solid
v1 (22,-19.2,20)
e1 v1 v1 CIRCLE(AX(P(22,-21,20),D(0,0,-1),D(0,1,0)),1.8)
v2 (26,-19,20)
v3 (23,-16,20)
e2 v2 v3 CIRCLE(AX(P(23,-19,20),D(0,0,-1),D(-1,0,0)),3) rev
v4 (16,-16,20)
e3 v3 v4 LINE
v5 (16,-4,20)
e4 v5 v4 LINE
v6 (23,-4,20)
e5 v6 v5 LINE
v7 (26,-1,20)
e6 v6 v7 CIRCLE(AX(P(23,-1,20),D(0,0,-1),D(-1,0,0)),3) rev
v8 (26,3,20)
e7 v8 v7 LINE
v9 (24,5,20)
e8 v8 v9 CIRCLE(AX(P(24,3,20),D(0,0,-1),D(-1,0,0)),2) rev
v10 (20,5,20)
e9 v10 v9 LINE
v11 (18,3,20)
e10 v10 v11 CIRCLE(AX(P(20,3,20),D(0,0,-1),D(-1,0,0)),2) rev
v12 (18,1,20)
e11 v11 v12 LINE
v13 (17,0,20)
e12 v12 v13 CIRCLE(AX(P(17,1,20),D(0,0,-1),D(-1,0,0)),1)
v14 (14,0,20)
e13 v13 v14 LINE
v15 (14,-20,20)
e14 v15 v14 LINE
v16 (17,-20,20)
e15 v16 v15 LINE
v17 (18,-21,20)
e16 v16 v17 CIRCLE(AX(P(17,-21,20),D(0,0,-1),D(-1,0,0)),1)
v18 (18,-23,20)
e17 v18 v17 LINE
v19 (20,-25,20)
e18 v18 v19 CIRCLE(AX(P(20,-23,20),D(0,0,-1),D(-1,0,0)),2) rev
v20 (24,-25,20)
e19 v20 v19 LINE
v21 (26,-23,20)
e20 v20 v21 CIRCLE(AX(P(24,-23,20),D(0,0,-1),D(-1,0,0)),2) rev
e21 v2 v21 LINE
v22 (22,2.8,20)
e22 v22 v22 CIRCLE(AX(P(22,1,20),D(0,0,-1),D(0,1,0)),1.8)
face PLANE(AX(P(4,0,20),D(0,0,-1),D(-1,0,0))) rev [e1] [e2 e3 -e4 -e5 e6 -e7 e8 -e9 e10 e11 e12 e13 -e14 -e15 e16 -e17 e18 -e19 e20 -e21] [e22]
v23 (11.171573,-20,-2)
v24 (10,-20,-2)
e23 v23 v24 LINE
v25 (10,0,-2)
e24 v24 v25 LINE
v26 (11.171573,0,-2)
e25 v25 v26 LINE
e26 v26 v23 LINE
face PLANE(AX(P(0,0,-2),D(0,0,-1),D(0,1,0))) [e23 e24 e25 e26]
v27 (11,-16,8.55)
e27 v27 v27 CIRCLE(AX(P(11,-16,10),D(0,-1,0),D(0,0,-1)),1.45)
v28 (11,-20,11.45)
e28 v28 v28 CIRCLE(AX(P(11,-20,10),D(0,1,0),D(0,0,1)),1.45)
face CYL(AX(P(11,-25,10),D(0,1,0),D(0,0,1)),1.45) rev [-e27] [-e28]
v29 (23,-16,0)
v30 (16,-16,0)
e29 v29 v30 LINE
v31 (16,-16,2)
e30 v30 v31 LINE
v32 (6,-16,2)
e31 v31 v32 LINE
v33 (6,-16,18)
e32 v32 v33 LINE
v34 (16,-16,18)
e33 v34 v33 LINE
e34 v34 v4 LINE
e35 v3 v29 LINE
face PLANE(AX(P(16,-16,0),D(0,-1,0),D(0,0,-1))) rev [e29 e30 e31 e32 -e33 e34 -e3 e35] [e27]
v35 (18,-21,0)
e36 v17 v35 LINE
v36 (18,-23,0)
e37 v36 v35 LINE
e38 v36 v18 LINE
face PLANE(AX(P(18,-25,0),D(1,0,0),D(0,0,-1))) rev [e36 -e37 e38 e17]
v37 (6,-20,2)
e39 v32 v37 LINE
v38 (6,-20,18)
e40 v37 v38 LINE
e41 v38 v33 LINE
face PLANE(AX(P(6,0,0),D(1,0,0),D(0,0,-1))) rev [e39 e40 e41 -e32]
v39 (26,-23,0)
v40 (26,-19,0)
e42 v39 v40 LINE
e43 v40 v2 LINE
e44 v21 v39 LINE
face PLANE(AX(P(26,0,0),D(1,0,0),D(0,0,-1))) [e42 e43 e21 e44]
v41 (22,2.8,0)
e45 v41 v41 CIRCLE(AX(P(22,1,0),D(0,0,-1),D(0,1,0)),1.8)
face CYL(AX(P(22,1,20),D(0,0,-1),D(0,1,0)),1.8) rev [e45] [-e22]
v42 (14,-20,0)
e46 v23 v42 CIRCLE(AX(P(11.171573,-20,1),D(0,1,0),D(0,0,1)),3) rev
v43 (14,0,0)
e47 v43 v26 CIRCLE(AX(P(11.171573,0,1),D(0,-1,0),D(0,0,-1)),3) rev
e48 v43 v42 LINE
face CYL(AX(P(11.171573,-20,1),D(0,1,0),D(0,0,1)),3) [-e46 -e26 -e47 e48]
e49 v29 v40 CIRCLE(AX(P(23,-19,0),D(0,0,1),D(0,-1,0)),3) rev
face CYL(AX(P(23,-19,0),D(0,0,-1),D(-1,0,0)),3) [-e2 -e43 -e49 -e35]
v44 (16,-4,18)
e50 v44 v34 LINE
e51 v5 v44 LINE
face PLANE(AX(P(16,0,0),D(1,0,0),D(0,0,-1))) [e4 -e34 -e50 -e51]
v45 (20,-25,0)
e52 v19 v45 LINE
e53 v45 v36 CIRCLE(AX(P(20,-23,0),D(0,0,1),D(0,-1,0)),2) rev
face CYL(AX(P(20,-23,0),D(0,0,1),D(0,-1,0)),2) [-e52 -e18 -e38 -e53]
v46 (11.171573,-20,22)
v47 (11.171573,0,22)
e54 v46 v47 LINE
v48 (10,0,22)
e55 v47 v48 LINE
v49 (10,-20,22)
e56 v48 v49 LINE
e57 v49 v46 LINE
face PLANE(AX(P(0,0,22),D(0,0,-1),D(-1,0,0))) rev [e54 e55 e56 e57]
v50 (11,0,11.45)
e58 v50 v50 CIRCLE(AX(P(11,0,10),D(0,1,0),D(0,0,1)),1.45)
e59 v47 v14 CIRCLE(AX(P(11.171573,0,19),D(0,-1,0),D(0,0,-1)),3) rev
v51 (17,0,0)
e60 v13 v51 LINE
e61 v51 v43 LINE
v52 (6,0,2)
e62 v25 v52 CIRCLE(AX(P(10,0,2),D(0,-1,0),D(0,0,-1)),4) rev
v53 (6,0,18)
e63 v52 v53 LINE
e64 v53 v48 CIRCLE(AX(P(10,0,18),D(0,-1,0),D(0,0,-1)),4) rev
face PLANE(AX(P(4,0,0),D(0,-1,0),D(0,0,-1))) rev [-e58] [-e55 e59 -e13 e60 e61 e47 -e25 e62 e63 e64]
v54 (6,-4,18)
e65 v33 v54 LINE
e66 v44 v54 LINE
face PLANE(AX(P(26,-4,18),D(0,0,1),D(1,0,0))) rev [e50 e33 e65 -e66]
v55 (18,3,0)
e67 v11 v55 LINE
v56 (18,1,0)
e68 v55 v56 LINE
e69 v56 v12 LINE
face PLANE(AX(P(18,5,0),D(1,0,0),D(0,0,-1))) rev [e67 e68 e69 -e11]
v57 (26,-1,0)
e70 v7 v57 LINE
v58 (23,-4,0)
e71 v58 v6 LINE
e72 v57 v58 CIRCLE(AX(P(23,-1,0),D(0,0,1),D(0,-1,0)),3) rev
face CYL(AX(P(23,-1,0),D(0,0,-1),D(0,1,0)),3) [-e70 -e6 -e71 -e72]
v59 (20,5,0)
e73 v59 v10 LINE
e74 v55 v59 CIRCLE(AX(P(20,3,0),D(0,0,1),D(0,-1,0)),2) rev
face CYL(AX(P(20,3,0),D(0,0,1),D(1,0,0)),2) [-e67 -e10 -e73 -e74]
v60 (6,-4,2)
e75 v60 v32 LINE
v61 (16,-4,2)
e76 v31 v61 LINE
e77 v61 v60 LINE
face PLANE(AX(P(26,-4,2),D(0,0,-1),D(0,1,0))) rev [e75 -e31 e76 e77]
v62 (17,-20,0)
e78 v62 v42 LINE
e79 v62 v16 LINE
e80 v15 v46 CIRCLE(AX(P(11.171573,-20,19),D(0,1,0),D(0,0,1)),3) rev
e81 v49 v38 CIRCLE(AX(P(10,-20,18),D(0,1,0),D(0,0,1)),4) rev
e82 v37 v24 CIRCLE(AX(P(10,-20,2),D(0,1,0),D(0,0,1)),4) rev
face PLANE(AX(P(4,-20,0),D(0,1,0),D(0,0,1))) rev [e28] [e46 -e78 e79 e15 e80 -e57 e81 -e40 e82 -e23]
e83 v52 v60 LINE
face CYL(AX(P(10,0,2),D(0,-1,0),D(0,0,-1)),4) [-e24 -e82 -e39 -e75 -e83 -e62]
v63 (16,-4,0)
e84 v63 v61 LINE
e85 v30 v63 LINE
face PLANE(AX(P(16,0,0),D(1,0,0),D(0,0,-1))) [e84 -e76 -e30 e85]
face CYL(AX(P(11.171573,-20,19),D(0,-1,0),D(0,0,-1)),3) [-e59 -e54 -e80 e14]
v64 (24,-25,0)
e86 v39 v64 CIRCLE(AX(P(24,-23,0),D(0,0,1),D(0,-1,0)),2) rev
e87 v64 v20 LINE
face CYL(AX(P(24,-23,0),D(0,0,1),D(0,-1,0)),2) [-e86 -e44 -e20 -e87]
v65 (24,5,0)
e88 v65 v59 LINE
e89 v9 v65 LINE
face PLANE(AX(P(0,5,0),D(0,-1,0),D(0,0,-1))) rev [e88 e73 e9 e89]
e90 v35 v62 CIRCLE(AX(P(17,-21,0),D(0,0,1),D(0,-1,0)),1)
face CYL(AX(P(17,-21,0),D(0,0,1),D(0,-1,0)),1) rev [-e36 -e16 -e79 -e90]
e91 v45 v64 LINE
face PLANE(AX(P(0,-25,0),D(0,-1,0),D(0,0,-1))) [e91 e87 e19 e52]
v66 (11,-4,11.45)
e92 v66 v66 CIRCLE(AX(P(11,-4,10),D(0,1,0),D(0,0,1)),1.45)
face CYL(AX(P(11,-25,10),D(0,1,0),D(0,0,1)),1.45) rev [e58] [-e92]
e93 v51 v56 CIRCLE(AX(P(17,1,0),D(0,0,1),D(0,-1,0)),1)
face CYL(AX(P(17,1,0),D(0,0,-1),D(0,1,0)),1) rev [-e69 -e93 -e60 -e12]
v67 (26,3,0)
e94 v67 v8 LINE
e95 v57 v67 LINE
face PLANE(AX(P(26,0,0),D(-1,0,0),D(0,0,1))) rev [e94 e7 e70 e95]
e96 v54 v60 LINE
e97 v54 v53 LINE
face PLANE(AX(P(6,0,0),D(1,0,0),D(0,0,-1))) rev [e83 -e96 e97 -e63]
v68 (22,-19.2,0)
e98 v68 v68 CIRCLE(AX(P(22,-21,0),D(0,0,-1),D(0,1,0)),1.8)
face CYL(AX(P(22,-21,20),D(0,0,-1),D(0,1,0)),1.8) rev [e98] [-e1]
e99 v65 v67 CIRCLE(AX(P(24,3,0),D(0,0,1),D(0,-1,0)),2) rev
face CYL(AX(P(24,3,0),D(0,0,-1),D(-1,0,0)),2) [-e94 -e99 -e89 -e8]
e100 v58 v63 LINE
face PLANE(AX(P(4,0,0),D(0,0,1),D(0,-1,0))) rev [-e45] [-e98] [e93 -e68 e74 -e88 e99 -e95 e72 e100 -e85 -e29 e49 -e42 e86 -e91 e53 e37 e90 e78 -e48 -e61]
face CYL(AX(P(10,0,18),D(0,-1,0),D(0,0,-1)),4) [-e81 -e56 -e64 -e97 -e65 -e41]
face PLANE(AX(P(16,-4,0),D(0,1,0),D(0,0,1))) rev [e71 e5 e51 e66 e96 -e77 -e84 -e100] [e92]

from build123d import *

# Parameters (mm, degrees)
SKETCH1_W           = 20
SKETCH1_H           = 20
BOSS_EXTRUDE1_DEPTH = 4
SKETCH2_R           = 3.7
CUT_EXTRUDE1_DEPTH  = 2.6
SKETCH3_R           = 2.1
CUT_EXTRUDE2_DEPTH  = 29.403520909
SKETCH4_W           = 12
SKETCH4_H           = 4
BOSS_EXTRUDE2_DEPTH = 12
SKETCH7_W           = 20
SKETCH7_H           = 4
BOSS_EXTRUDE3_DEPTH = 10
SKETCH8_W           = 8
SKETCH8_H           = 20
BOSS_EXTRUDE4_DEPTH = 5
SKETCH9_W           = 8
SKETCH9_H           = 20
BOSS_EXTRUDE5_DEPTH = 5
SKETCH10_R          = 1.8
CUT_EXTRUDE5_DEPTH  = 42.243181255
SKETCH11_W          = 30
SKETCH11_H          = 30
CUT_EXTRUDE6_DEPTH  = 6
SKETCH12_R          = 1.45
CUT_EXTRUDE7_DEPTH  = 42.243181255
SKETCH13_W          = 8
SKETCH13_H          = 20
BOSS_EXTRUDE6_DEPTH = 2
SKETCH14_W          = 8
SKETCH14_H          = 20
BOSS_EXTRUDE7_DEPTH = 2
SKETCH15_W          = 16
SKETCH15_H          = 12
CUT_EXTRUDE8_DEPTH  = 39.845849199
FILLET2_R           = 3
FILLET4_R           = 2
FILLET5_START       = -21
FILLET5_DEPTH       = 22
FILLET6_R           = 3
FILLET7_R           = 1
FILLET8_R           = 1


with BuildPart() as part:
    # Sketch1 → Boss-Extrude1 (new body)
    with BuildSketch(Plane(origin=(0, 0, 0), x_dir=(0, 0, -1), z_dir=(1, 0, 0))):
        with Locations((-10, -10)):
            Rectangle(SKETCH1_W, SKETCH1_H)
    extrude(amount=BOSS_EXTRUDE1_DEPTH)

    # Sketch2 → Cut-Extrude1 (cut)
    with BuildSketch(Plane(origin=(4, 0, 0), x_dir=(0, 0, -1), z_dir=(1, 0, 0))):
        with Locations((-10, -10)):
            Circle(SKETCH2_R)
    extrude(amount=-CUT_EXTRUDE1_DEPTH, mode=Mode.SUBTRACT)

    # Sketch3 → Cut-Extrude2 (cut, through all)
    with BuildSketch(Plane(origin=(1.4, 0, 0), x_dir=(0, 0, -1), z_dir=(1, 0, 0))):
        with Locations((-10, -10)):
            Circle(SKETCH3_R)
    extrude(amount=-CUT_EXTRUDE2_DEPTH, mode=Mode.SUBTRACT)

    # Sketch4 → Boss-Extrude2 (add)
    with BuildSketch(Plane(origin=(4, 0, 0), x_dir=(0, 0, -1), z_dir=(1, 0, 0))):
        Polygon((-20, 0), (-20, -20), (-16, -20), (-16, -16), (-16, -4), (-16, 0), align=None)
        with Locations((-10, -18)):
            Rectangle(SKETCH4_W, SKETCH4_H)
        Polygon((-4, -16), (-4, -20), (0, -20), (0, -4), (-4, -4), align=None)
        Polygon((0, 0), (-16, 0), (-16, -4), (-4, -4), (0, -4), align=None)
    extrude(amount=BOSS_EXTRUDE2_DEPTH)

    # Sketch7 → Boss-Extrude3 (add)
    with BuildSketch(Plane(origin=(16, 0, 0), x_dir=(0, 0, -1), z_dir=(1, 0, 0))):
        with Locations((-10, -18)):
            Rectangle(SKETCH7_W, SKETCH7_H)
        with Locations((-10, -2)):
            Rectangle(SKETCH7_W, SKETCH7_H)
    extrude(amount=BOSS_EXTRUDE3_DEPTH)

    # Sketch8 → Boss-Extrude4 (add)
    with BuildSketch(Plane(origin=(0, -20, 0), x_dir=(-1, 0, 0), z_dir=(0, -1, 0))):
        with Locations((-22, -10)):
            Rectangle(SKETCH8_W, SKETCH8_H)
    extrude(amount=BOSS_EXTRUDE4_DEPTH)

    # Sketch9 → Boss-Extrude5 (add)
    with BuildSketch(Plane(origin=(0, 0, 0), x_dir=(1, 0, 0), z_dir=(0, 1, 0))):
        with Locations((22, -10)):
            Rectangle(SKETCH9_W, SKETCH9_H)
    extrude(amount=BOSS_EXTRUDE5_DEPTH)

    # Sketch10 → Cut-Extrude5 (cut, through all)
    with BuildSketch(Plane(origin=(0, 0, 0), x_dir=(-1, 0, 0), z_dir=(0, 0, -1))):
        with Locations(Location((-22, 1, 0), (0, 0, 90))):
            Circle(SKETCH10_R)
        with Locations(Location((-22, -21, 0), (0, 0, 90))):
            Circle(SKETCH10_R)
    extrude(amount=-CUT_EXTRUDE5_DEPTH, mode=Mode.SUBTRACT)

    # Sketch11 → Cut-Extrude6 (cut)
    with BuildSketch(Plane.ZY):
        with Locations((15, -5)):
            Rectangle(SKETCH11_W, SKETCH11_H)
    extrude(amount=-CUT_EXTRUDE6_DEPTH, mode=Mode.SUBTRACT)

    # Sketch12 → Cut-Extrude7 (cut, through all)
    with BuildSketch(Plane(origin=(0, 0, 0), x_dir=(1, 0, 0), z_dir=(0, 1, 0))):
        with Locations(Location((11, -10, 0), (0, 0, 270))):
            Circle(SKETCH12_R)
    extrude(amount=-CUT_EXTRUDE7_DEPTH, mode=Mode.SUBTRACT)

    # Sketch13 → Boss-Extrude6 (add)
    with BuildSketch(Plane.XY.offset(20)):
        with Locations((10, -10)):
            Rectangle(SKETCH13_W, SKETCH13_H)
    extrude(amount=BOSS_EXTRUDE6_DEPTH)

    # Sketch14 → Boss-Extrude7 (add)
    with BuildSketch(Plane(origin=(0, 0, 0), x_dir=(-1, 0, 0), z_dir=(0, 0, -1))):
        with Locations((-10, -10)):
            Rectangle(SKETCH14_W, SKETCH14_H)
    extrude(amount=BOSS_EXTRUDE7_DEPTH)

    # Sketch15 → Cut-Extrude8 (cut, through all)
    with BuildSketch(Plane.ZY.offset(-6)):
        with Locations((10, -10)):
            Rectangle(SKETCH15_W, SKETCH15_H)
    extrude(amount=-CUT_EXTRUDE8_DEPTH, mode=Mode.SUBTRACT)

    # Fillet2
    fillet2_edges = [part.edges().sort_by_distance(p)[0] for p in [
        (26, -16, 10),
        (26, -4, 10),
    ]]
    fillet(fillet2_edges, radius=FILLET2_R)

    # Fillet4
    fillet4_edges = [part.edges().sort_by_distance(p)[0] for p in [
        (26, -25, 10),
        (18, -25, 10),
        (26, 5, 10),
        (18, 5, 10),
    ]]
    fillet(fillet4_edges, radius=FILLET4_R)

    # Fillet5: read off the stored shape, not the designer's step
    # Fillet5 outline → Fillet5 (cut)
    with BuildSketch(Plane(origin=(0, 0, 0), x_dir=(1, 0, 0), z_dir=(0, 1, 0)).offset(FILLET5_START)):
        with BuildLine():
            Line((6, 2), (6, -2))
            ThreePointArc((6, -2), (7.171572875, 0.828427125), (10, 2))
            Line((10, 2), (6, 2))
        make_face()
        with BuildLine():
            ThreePointArc((10, -22), (7.171572875, -20.828427125), (6, -18))
            Line((6, -18), (6, -22))
            Line((6, -22), (10, -22))
        make_face()
    extrude(amount=FILLET5_DEPTH, mode=Mode.SUBTRACT)

    # Fillet6
    # the kernel refuses this fillet: 3 mm, written as the material it takes off along each edge
    with BuildSketch(Plane(origin=(14, -27.071067812, -2), x_dir=(-1, 0, 0), z_dir=(0, 1, 0))) as fillet6_piece_1:
        with BuildLine():
            CenterArc((2.828427125, 3), FILLET6_R, 199.471220634, 70.528779366)
            Line((0, 2), (-0.056568542, 1.98))
            ThreePointArc((-0.056568542, 1.98), (-0.06, 1), (-0.06, 0))
            Line((-0.06, 0), (0, -0.06))
            Line((0, -0.06), (2.828427125, -0.06))
            Line((2.828427125, -0.06), (2.828427125, 0))
        make_face()
    extrude(amount=34.142135624, mode=Mode.SUBTRACT)
    with BuildSketch(Plane(origin=(14, -27.071067812, 22), x_dir=(0, 0, -1), z_dir=(0, 1, 0))) as fillet6_piece_2:
        with BuildLine():
            CenterArc((3, 2.828427125), FILLET6_R, 180, 70.528779366)
            Line((0, 2.828427125), (-0.06, 2.828427125))
            Line((-0.06, 2.828427125), (-0.06, 0))
            Line((-0.06, 0), (0, -0.06))
            ThreePointArc((0, -0.06), (1, -0.06), (1.98, -0.056568542))
            Line((1.98, -0.056568542), (2, 0))
        make_face()
    extrude(amount=34.142135624, mode=Mode.SUBTRACT)

    # Fillet7
    fillet7_edges = [part.edges().sort_by_distance(p)[0] for p in [
        (18, -20, 10),
    ]]
    fillet(fillet7_edges, radius=FILLET7_R)

    # Fillet8
    fillet8_edges = [part.edges().sort_by_distance(p)[0] for p in [
        (18, 0, 10),
    ]]
    fillet(fillet8_edges, radius=FILLET8_R)


solid = part.part
